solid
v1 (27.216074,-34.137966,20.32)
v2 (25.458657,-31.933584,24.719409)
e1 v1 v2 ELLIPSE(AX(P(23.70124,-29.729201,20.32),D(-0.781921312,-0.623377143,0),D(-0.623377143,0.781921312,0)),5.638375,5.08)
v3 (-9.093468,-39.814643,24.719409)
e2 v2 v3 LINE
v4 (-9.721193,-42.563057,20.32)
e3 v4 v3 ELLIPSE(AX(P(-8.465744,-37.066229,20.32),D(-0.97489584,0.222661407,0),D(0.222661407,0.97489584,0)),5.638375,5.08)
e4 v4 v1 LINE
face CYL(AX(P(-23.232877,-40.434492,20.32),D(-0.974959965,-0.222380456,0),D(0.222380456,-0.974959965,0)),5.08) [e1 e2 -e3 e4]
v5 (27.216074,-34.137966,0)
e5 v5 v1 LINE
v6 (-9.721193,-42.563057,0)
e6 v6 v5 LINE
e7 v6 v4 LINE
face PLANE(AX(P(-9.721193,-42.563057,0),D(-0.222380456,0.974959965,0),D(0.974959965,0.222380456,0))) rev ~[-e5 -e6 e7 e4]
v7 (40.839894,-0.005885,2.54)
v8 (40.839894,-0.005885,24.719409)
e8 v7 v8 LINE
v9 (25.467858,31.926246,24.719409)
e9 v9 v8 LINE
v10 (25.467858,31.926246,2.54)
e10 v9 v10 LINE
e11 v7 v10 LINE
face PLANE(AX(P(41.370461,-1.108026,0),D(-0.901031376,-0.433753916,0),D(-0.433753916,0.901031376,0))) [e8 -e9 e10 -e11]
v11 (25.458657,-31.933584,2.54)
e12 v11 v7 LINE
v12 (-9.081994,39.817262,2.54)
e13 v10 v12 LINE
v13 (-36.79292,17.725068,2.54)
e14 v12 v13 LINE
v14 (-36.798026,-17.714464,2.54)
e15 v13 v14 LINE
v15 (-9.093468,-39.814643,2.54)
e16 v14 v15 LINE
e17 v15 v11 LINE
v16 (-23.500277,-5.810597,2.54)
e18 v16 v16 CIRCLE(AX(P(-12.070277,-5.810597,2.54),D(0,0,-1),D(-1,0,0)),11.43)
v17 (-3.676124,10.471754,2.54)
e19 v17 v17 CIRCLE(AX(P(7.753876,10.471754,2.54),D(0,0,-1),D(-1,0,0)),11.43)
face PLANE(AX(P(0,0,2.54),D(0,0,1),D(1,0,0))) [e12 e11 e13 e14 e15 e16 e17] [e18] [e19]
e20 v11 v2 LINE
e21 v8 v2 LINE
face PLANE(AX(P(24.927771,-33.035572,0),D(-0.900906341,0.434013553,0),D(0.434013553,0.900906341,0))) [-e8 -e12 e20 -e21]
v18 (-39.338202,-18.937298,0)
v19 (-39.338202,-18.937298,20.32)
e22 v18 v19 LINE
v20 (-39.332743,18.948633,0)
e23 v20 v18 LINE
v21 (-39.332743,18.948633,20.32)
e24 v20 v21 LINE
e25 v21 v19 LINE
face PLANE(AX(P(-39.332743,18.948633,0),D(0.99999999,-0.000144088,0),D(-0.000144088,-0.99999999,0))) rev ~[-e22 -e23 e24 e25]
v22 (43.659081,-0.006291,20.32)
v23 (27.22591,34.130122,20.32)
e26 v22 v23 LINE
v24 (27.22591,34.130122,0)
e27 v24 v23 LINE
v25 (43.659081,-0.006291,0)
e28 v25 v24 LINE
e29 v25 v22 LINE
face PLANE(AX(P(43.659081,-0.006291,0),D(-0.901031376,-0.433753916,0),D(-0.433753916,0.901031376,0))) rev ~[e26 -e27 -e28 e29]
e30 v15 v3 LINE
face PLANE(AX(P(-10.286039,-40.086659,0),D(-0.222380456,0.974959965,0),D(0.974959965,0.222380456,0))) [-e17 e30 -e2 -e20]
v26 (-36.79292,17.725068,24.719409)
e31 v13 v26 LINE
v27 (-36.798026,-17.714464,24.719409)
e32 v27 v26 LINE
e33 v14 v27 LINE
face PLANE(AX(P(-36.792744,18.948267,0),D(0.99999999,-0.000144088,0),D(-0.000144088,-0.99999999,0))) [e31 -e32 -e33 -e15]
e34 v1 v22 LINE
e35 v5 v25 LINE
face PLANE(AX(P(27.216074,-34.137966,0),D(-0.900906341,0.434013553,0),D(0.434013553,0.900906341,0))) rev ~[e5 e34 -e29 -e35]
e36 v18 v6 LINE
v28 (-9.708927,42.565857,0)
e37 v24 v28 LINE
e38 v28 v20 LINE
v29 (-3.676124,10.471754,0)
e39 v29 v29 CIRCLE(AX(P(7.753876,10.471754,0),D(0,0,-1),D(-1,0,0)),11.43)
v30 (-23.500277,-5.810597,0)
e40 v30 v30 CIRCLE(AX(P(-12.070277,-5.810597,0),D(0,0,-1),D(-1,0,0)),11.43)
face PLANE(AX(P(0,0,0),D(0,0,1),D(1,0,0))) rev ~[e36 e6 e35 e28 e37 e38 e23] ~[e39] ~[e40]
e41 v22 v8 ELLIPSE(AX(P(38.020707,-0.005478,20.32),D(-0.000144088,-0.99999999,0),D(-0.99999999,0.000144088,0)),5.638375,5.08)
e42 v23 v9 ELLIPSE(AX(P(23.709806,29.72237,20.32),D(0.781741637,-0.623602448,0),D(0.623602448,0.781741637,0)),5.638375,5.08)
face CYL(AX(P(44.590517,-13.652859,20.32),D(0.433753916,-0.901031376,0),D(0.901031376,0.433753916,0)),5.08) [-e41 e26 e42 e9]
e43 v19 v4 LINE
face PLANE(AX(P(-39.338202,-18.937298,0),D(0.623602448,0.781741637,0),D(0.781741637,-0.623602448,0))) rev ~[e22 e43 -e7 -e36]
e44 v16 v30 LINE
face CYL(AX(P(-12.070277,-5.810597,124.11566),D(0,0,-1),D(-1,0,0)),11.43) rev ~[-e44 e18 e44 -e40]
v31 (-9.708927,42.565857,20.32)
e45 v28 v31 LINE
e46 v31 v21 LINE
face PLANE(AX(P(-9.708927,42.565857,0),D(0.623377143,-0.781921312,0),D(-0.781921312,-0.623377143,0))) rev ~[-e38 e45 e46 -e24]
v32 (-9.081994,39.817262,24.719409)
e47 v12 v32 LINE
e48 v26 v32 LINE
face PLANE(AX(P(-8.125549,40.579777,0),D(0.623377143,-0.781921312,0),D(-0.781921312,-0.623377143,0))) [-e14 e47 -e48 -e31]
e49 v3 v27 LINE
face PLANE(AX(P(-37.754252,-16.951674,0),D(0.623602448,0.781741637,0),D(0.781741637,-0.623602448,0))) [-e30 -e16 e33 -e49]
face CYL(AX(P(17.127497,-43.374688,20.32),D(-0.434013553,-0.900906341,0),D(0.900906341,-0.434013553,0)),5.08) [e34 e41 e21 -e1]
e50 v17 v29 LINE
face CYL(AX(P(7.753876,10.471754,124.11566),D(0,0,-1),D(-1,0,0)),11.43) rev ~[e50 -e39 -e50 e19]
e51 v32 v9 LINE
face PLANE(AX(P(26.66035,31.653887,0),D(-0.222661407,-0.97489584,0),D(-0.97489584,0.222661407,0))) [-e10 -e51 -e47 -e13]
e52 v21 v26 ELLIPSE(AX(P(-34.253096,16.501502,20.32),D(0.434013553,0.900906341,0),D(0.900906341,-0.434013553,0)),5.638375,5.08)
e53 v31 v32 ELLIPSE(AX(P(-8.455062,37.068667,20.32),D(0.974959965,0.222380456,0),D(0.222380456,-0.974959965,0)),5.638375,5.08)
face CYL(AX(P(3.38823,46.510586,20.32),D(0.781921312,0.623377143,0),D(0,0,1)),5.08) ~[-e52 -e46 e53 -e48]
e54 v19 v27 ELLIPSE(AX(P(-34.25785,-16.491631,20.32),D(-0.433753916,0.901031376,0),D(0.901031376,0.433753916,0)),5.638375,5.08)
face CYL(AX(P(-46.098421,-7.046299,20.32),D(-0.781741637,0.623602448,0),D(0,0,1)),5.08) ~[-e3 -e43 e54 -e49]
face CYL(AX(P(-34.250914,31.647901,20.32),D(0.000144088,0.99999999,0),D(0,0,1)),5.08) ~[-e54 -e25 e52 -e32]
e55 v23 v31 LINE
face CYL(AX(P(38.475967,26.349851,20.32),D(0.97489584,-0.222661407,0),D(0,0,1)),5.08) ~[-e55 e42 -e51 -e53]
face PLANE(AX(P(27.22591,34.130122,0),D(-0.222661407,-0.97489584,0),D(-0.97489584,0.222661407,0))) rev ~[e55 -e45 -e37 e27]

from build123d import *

# Parameters (mm, degrees)
F1_DEPTH     = 25.4
F2_T         = -2.54
F4_D         = 22.86
F6_D         = 22.86
F9_T1_DEPTH  = 63.2859311747
F9_T3_DEPTH  = 63.2859311747
F9_T5_DEPTH  = 63.2859311747
F9_T7_DEPTH  = 63.2859311747
F9_T9_DEPTH  = 63.2859311747
F9_T11_DEPTH = 63.2859311747
F9_T13_DEPTH = 63.2859311747


# Not quite as in the source:
# - a fillet or chamfer that OpenCascade refuses, or shapes differently, is made with other operations: its cross-section is extruded or revolved along the edge and cut away or added
# - the program builds the solid bodies; features that only make, move or delete a surface that nothing else refers to are left out


with BuildPart() as f1:
    # F0 (on Top) → F1 (new body)
    with BuildSketch(Plane.XY):
        Polygon((27.2259101757, 34.1301219533), (-9.7089265027, 42.5658566882), (-39.3327434985, 18.9486331517), (-39.3382023982, -18.9372976297), (-9.721192539, -42.5630570455), (27.2160735783, -34.1379663779), (43.6590811844, -0.0062907401), align=None)
    extrude(amount=F1_DEPTH)

    # F2
    f2_openings = [f1.faces().sort_by_distance(p)[0] for p in [
        (0, 0, 25.4),
    ]]
    offset(amount=F2_T, openings=f2_openings)

    # F4 (through all)
    with Locations(Plane.XY.offset(2.54)):
        with Locations((-12.0702767901, -5.8105965731)):
            Hole(F4_D / 2)

    # F6 (through all)
    with Locations(Plane.XY.offset(2.54)):
        with Locations((7.7538759853, 10.4717538884)):
            Hole(F6_D / 2)

    # F9: fillet of radius 5.08 on 7 edges, made by hand

    # F9_s2 → F9_t1 (cut)
    with BuildSketch(Plane(origin=(30.848595501, -7.0456672344, 0), x_dir=(0, 0, 1), z_dir=(-0.9748958395, 0.2226614068, 0))):
        with BuildLine():
            ThreePointArc((25.4, 34.2554733567), (23.9121024484, 37.8475758051), (20.32, 39.3354733567))
            Line((20.32, 39.3354733567), (25.4, 39.3354733567))
            Line((25.4, 39.3354733567), (25.4, 34.2554733567))
        make_face()
    extrude(amount=F9_T1_DEPTH, mode=Mode.SUBTRACT)

    # F9_s4 → F9_t3 (cut)
    with BuildSketch(Plane(origin=(24.7423091554, 19.7255014847, 0), x_dir=(0, 0, 1), z_dir=(-0.7819213116, -0.623377143, 0))):
        with BuildLine():
            ThreePointArc((25.4, 34.2554733567), (23.9121024484, 37.8475758051), (20.32, 39.3354733567))
            Line((20.32, 39.3354733567), (25.4, 39.3354733567))
            Line((25.4, 39.3354733567), (25.4, 34.2554733567))
        make_face()
    extrude(amount=F9_T3_DEPTH, mode=Mode.SUBTRACT)

    # F9_s6 → F9_t5 (cut)
    with BuildSketch(Plane(origin=(0.0045593646, 31.6429652589, 0), x_dir=(0, 0, 1), z_dir=(-0.0001440878, -0.9999999896, 0))):
        with BuildLine():
            ThreePointArc((25.4, 34.2554733567), (23.9121024484, 37.8475758051), (20.32, 39.3354733567))
            Line((20.32, 39.3354733567), (25.4, 39.3354733567))
            Line((25.4, 39.3354733567), (25.4, 34.2554733567))
        make_face()
    extrude(amount=F9_T5_DEPTH, mode=Mode.SUBTRACT)

    # F9_s8 → F9_t7 (cut)
    with BuildSketch(Plane(origin=(-24.7366237207, 19.7326307943, 0), x_dir=(0, 0, 1), z_dir=(0.7817416371, -0.6236024477, 0))):
        with BuildLine():
            ThreePointArc((25.4, 34.2554733567), (23.9121024484, 37.8475758051), (20.32, 39.3354733567))
            Line((20.32, 39.3354733567), (25.4, 39.3354733567))
            Line((25.4, 39.3354733567), (25.4, 34.2554733567))
        make_face()
    extrude(amount=F9_T7_DEPTH, mode=Mode.SUBTRACT)

    # F9_s10 → F9_t9 (cut)
    with BuildSketch(Plane(origin=(-30.8506246092, -7.0367771307, 0), x_dir=(0, 0, 1), z_dir=(0.9749599646, 0.2223804564, 0))):
        with BuildLine():
            ThreePointArc((20.32, 39.3354733567), (23.9121024484, 37.8475758051), (25.4, 34.2554733567))
            Line((25.4, 34.2554733567), (25.4, 39.3354733567))
            Line((25.4, 39.3354733567), (20.32, 39.3354733567))
        make_face()
    extrude(amount=F9_T9_DEPTH, mode=Mode.SUBTRACT)

    # F9_s12 → F9_t11 (cut)
    with BuildSketch(Plane(origin=(-13.7334759289, -28.5073483522, 0), x_dir=(0, 0, 1), z_dir=(0.4340135532, 0.9009063412, 0))):
        with BuildLine():
            ThreePointArc((20.32, 39.3354733567), (23.9121024484, 37.8475758051), (25.4, 34.2554733567))
            Line((25.4, 34.2554733567), (25.4, 39.3354733567))
            Line((25.4, 39.3354733567), (20.32, 39.3354733567))
        make_face()
    extrude(amount=F9_T11_DEPTH, mode=Mode.SUBTRACT)

    # F9_s14 → F9_t13 (cut)
    with BuildSketch(Plane(origin=(13.7252602377, -28.5113048206, 0), x_dir=(0, 0, 1), z_dir=(-0.433753916, 0.9010313759, 0))):
        with BuildLine():
            ThreePointArc((20.32, 39.3354733567), (23.9121024484, 37.8475758051), (25.4, 34.2554733567))
            Line((25.4, 34.2554733567), (25.4, 39.3354733567))
            Line((25.4, 39.3354733567), (20.32, 39.3354733567))
        make_face()
    extrude(amount=F9_T13_DEPTH, mode=Mode.SUBTRACT)


solid = f1.part
